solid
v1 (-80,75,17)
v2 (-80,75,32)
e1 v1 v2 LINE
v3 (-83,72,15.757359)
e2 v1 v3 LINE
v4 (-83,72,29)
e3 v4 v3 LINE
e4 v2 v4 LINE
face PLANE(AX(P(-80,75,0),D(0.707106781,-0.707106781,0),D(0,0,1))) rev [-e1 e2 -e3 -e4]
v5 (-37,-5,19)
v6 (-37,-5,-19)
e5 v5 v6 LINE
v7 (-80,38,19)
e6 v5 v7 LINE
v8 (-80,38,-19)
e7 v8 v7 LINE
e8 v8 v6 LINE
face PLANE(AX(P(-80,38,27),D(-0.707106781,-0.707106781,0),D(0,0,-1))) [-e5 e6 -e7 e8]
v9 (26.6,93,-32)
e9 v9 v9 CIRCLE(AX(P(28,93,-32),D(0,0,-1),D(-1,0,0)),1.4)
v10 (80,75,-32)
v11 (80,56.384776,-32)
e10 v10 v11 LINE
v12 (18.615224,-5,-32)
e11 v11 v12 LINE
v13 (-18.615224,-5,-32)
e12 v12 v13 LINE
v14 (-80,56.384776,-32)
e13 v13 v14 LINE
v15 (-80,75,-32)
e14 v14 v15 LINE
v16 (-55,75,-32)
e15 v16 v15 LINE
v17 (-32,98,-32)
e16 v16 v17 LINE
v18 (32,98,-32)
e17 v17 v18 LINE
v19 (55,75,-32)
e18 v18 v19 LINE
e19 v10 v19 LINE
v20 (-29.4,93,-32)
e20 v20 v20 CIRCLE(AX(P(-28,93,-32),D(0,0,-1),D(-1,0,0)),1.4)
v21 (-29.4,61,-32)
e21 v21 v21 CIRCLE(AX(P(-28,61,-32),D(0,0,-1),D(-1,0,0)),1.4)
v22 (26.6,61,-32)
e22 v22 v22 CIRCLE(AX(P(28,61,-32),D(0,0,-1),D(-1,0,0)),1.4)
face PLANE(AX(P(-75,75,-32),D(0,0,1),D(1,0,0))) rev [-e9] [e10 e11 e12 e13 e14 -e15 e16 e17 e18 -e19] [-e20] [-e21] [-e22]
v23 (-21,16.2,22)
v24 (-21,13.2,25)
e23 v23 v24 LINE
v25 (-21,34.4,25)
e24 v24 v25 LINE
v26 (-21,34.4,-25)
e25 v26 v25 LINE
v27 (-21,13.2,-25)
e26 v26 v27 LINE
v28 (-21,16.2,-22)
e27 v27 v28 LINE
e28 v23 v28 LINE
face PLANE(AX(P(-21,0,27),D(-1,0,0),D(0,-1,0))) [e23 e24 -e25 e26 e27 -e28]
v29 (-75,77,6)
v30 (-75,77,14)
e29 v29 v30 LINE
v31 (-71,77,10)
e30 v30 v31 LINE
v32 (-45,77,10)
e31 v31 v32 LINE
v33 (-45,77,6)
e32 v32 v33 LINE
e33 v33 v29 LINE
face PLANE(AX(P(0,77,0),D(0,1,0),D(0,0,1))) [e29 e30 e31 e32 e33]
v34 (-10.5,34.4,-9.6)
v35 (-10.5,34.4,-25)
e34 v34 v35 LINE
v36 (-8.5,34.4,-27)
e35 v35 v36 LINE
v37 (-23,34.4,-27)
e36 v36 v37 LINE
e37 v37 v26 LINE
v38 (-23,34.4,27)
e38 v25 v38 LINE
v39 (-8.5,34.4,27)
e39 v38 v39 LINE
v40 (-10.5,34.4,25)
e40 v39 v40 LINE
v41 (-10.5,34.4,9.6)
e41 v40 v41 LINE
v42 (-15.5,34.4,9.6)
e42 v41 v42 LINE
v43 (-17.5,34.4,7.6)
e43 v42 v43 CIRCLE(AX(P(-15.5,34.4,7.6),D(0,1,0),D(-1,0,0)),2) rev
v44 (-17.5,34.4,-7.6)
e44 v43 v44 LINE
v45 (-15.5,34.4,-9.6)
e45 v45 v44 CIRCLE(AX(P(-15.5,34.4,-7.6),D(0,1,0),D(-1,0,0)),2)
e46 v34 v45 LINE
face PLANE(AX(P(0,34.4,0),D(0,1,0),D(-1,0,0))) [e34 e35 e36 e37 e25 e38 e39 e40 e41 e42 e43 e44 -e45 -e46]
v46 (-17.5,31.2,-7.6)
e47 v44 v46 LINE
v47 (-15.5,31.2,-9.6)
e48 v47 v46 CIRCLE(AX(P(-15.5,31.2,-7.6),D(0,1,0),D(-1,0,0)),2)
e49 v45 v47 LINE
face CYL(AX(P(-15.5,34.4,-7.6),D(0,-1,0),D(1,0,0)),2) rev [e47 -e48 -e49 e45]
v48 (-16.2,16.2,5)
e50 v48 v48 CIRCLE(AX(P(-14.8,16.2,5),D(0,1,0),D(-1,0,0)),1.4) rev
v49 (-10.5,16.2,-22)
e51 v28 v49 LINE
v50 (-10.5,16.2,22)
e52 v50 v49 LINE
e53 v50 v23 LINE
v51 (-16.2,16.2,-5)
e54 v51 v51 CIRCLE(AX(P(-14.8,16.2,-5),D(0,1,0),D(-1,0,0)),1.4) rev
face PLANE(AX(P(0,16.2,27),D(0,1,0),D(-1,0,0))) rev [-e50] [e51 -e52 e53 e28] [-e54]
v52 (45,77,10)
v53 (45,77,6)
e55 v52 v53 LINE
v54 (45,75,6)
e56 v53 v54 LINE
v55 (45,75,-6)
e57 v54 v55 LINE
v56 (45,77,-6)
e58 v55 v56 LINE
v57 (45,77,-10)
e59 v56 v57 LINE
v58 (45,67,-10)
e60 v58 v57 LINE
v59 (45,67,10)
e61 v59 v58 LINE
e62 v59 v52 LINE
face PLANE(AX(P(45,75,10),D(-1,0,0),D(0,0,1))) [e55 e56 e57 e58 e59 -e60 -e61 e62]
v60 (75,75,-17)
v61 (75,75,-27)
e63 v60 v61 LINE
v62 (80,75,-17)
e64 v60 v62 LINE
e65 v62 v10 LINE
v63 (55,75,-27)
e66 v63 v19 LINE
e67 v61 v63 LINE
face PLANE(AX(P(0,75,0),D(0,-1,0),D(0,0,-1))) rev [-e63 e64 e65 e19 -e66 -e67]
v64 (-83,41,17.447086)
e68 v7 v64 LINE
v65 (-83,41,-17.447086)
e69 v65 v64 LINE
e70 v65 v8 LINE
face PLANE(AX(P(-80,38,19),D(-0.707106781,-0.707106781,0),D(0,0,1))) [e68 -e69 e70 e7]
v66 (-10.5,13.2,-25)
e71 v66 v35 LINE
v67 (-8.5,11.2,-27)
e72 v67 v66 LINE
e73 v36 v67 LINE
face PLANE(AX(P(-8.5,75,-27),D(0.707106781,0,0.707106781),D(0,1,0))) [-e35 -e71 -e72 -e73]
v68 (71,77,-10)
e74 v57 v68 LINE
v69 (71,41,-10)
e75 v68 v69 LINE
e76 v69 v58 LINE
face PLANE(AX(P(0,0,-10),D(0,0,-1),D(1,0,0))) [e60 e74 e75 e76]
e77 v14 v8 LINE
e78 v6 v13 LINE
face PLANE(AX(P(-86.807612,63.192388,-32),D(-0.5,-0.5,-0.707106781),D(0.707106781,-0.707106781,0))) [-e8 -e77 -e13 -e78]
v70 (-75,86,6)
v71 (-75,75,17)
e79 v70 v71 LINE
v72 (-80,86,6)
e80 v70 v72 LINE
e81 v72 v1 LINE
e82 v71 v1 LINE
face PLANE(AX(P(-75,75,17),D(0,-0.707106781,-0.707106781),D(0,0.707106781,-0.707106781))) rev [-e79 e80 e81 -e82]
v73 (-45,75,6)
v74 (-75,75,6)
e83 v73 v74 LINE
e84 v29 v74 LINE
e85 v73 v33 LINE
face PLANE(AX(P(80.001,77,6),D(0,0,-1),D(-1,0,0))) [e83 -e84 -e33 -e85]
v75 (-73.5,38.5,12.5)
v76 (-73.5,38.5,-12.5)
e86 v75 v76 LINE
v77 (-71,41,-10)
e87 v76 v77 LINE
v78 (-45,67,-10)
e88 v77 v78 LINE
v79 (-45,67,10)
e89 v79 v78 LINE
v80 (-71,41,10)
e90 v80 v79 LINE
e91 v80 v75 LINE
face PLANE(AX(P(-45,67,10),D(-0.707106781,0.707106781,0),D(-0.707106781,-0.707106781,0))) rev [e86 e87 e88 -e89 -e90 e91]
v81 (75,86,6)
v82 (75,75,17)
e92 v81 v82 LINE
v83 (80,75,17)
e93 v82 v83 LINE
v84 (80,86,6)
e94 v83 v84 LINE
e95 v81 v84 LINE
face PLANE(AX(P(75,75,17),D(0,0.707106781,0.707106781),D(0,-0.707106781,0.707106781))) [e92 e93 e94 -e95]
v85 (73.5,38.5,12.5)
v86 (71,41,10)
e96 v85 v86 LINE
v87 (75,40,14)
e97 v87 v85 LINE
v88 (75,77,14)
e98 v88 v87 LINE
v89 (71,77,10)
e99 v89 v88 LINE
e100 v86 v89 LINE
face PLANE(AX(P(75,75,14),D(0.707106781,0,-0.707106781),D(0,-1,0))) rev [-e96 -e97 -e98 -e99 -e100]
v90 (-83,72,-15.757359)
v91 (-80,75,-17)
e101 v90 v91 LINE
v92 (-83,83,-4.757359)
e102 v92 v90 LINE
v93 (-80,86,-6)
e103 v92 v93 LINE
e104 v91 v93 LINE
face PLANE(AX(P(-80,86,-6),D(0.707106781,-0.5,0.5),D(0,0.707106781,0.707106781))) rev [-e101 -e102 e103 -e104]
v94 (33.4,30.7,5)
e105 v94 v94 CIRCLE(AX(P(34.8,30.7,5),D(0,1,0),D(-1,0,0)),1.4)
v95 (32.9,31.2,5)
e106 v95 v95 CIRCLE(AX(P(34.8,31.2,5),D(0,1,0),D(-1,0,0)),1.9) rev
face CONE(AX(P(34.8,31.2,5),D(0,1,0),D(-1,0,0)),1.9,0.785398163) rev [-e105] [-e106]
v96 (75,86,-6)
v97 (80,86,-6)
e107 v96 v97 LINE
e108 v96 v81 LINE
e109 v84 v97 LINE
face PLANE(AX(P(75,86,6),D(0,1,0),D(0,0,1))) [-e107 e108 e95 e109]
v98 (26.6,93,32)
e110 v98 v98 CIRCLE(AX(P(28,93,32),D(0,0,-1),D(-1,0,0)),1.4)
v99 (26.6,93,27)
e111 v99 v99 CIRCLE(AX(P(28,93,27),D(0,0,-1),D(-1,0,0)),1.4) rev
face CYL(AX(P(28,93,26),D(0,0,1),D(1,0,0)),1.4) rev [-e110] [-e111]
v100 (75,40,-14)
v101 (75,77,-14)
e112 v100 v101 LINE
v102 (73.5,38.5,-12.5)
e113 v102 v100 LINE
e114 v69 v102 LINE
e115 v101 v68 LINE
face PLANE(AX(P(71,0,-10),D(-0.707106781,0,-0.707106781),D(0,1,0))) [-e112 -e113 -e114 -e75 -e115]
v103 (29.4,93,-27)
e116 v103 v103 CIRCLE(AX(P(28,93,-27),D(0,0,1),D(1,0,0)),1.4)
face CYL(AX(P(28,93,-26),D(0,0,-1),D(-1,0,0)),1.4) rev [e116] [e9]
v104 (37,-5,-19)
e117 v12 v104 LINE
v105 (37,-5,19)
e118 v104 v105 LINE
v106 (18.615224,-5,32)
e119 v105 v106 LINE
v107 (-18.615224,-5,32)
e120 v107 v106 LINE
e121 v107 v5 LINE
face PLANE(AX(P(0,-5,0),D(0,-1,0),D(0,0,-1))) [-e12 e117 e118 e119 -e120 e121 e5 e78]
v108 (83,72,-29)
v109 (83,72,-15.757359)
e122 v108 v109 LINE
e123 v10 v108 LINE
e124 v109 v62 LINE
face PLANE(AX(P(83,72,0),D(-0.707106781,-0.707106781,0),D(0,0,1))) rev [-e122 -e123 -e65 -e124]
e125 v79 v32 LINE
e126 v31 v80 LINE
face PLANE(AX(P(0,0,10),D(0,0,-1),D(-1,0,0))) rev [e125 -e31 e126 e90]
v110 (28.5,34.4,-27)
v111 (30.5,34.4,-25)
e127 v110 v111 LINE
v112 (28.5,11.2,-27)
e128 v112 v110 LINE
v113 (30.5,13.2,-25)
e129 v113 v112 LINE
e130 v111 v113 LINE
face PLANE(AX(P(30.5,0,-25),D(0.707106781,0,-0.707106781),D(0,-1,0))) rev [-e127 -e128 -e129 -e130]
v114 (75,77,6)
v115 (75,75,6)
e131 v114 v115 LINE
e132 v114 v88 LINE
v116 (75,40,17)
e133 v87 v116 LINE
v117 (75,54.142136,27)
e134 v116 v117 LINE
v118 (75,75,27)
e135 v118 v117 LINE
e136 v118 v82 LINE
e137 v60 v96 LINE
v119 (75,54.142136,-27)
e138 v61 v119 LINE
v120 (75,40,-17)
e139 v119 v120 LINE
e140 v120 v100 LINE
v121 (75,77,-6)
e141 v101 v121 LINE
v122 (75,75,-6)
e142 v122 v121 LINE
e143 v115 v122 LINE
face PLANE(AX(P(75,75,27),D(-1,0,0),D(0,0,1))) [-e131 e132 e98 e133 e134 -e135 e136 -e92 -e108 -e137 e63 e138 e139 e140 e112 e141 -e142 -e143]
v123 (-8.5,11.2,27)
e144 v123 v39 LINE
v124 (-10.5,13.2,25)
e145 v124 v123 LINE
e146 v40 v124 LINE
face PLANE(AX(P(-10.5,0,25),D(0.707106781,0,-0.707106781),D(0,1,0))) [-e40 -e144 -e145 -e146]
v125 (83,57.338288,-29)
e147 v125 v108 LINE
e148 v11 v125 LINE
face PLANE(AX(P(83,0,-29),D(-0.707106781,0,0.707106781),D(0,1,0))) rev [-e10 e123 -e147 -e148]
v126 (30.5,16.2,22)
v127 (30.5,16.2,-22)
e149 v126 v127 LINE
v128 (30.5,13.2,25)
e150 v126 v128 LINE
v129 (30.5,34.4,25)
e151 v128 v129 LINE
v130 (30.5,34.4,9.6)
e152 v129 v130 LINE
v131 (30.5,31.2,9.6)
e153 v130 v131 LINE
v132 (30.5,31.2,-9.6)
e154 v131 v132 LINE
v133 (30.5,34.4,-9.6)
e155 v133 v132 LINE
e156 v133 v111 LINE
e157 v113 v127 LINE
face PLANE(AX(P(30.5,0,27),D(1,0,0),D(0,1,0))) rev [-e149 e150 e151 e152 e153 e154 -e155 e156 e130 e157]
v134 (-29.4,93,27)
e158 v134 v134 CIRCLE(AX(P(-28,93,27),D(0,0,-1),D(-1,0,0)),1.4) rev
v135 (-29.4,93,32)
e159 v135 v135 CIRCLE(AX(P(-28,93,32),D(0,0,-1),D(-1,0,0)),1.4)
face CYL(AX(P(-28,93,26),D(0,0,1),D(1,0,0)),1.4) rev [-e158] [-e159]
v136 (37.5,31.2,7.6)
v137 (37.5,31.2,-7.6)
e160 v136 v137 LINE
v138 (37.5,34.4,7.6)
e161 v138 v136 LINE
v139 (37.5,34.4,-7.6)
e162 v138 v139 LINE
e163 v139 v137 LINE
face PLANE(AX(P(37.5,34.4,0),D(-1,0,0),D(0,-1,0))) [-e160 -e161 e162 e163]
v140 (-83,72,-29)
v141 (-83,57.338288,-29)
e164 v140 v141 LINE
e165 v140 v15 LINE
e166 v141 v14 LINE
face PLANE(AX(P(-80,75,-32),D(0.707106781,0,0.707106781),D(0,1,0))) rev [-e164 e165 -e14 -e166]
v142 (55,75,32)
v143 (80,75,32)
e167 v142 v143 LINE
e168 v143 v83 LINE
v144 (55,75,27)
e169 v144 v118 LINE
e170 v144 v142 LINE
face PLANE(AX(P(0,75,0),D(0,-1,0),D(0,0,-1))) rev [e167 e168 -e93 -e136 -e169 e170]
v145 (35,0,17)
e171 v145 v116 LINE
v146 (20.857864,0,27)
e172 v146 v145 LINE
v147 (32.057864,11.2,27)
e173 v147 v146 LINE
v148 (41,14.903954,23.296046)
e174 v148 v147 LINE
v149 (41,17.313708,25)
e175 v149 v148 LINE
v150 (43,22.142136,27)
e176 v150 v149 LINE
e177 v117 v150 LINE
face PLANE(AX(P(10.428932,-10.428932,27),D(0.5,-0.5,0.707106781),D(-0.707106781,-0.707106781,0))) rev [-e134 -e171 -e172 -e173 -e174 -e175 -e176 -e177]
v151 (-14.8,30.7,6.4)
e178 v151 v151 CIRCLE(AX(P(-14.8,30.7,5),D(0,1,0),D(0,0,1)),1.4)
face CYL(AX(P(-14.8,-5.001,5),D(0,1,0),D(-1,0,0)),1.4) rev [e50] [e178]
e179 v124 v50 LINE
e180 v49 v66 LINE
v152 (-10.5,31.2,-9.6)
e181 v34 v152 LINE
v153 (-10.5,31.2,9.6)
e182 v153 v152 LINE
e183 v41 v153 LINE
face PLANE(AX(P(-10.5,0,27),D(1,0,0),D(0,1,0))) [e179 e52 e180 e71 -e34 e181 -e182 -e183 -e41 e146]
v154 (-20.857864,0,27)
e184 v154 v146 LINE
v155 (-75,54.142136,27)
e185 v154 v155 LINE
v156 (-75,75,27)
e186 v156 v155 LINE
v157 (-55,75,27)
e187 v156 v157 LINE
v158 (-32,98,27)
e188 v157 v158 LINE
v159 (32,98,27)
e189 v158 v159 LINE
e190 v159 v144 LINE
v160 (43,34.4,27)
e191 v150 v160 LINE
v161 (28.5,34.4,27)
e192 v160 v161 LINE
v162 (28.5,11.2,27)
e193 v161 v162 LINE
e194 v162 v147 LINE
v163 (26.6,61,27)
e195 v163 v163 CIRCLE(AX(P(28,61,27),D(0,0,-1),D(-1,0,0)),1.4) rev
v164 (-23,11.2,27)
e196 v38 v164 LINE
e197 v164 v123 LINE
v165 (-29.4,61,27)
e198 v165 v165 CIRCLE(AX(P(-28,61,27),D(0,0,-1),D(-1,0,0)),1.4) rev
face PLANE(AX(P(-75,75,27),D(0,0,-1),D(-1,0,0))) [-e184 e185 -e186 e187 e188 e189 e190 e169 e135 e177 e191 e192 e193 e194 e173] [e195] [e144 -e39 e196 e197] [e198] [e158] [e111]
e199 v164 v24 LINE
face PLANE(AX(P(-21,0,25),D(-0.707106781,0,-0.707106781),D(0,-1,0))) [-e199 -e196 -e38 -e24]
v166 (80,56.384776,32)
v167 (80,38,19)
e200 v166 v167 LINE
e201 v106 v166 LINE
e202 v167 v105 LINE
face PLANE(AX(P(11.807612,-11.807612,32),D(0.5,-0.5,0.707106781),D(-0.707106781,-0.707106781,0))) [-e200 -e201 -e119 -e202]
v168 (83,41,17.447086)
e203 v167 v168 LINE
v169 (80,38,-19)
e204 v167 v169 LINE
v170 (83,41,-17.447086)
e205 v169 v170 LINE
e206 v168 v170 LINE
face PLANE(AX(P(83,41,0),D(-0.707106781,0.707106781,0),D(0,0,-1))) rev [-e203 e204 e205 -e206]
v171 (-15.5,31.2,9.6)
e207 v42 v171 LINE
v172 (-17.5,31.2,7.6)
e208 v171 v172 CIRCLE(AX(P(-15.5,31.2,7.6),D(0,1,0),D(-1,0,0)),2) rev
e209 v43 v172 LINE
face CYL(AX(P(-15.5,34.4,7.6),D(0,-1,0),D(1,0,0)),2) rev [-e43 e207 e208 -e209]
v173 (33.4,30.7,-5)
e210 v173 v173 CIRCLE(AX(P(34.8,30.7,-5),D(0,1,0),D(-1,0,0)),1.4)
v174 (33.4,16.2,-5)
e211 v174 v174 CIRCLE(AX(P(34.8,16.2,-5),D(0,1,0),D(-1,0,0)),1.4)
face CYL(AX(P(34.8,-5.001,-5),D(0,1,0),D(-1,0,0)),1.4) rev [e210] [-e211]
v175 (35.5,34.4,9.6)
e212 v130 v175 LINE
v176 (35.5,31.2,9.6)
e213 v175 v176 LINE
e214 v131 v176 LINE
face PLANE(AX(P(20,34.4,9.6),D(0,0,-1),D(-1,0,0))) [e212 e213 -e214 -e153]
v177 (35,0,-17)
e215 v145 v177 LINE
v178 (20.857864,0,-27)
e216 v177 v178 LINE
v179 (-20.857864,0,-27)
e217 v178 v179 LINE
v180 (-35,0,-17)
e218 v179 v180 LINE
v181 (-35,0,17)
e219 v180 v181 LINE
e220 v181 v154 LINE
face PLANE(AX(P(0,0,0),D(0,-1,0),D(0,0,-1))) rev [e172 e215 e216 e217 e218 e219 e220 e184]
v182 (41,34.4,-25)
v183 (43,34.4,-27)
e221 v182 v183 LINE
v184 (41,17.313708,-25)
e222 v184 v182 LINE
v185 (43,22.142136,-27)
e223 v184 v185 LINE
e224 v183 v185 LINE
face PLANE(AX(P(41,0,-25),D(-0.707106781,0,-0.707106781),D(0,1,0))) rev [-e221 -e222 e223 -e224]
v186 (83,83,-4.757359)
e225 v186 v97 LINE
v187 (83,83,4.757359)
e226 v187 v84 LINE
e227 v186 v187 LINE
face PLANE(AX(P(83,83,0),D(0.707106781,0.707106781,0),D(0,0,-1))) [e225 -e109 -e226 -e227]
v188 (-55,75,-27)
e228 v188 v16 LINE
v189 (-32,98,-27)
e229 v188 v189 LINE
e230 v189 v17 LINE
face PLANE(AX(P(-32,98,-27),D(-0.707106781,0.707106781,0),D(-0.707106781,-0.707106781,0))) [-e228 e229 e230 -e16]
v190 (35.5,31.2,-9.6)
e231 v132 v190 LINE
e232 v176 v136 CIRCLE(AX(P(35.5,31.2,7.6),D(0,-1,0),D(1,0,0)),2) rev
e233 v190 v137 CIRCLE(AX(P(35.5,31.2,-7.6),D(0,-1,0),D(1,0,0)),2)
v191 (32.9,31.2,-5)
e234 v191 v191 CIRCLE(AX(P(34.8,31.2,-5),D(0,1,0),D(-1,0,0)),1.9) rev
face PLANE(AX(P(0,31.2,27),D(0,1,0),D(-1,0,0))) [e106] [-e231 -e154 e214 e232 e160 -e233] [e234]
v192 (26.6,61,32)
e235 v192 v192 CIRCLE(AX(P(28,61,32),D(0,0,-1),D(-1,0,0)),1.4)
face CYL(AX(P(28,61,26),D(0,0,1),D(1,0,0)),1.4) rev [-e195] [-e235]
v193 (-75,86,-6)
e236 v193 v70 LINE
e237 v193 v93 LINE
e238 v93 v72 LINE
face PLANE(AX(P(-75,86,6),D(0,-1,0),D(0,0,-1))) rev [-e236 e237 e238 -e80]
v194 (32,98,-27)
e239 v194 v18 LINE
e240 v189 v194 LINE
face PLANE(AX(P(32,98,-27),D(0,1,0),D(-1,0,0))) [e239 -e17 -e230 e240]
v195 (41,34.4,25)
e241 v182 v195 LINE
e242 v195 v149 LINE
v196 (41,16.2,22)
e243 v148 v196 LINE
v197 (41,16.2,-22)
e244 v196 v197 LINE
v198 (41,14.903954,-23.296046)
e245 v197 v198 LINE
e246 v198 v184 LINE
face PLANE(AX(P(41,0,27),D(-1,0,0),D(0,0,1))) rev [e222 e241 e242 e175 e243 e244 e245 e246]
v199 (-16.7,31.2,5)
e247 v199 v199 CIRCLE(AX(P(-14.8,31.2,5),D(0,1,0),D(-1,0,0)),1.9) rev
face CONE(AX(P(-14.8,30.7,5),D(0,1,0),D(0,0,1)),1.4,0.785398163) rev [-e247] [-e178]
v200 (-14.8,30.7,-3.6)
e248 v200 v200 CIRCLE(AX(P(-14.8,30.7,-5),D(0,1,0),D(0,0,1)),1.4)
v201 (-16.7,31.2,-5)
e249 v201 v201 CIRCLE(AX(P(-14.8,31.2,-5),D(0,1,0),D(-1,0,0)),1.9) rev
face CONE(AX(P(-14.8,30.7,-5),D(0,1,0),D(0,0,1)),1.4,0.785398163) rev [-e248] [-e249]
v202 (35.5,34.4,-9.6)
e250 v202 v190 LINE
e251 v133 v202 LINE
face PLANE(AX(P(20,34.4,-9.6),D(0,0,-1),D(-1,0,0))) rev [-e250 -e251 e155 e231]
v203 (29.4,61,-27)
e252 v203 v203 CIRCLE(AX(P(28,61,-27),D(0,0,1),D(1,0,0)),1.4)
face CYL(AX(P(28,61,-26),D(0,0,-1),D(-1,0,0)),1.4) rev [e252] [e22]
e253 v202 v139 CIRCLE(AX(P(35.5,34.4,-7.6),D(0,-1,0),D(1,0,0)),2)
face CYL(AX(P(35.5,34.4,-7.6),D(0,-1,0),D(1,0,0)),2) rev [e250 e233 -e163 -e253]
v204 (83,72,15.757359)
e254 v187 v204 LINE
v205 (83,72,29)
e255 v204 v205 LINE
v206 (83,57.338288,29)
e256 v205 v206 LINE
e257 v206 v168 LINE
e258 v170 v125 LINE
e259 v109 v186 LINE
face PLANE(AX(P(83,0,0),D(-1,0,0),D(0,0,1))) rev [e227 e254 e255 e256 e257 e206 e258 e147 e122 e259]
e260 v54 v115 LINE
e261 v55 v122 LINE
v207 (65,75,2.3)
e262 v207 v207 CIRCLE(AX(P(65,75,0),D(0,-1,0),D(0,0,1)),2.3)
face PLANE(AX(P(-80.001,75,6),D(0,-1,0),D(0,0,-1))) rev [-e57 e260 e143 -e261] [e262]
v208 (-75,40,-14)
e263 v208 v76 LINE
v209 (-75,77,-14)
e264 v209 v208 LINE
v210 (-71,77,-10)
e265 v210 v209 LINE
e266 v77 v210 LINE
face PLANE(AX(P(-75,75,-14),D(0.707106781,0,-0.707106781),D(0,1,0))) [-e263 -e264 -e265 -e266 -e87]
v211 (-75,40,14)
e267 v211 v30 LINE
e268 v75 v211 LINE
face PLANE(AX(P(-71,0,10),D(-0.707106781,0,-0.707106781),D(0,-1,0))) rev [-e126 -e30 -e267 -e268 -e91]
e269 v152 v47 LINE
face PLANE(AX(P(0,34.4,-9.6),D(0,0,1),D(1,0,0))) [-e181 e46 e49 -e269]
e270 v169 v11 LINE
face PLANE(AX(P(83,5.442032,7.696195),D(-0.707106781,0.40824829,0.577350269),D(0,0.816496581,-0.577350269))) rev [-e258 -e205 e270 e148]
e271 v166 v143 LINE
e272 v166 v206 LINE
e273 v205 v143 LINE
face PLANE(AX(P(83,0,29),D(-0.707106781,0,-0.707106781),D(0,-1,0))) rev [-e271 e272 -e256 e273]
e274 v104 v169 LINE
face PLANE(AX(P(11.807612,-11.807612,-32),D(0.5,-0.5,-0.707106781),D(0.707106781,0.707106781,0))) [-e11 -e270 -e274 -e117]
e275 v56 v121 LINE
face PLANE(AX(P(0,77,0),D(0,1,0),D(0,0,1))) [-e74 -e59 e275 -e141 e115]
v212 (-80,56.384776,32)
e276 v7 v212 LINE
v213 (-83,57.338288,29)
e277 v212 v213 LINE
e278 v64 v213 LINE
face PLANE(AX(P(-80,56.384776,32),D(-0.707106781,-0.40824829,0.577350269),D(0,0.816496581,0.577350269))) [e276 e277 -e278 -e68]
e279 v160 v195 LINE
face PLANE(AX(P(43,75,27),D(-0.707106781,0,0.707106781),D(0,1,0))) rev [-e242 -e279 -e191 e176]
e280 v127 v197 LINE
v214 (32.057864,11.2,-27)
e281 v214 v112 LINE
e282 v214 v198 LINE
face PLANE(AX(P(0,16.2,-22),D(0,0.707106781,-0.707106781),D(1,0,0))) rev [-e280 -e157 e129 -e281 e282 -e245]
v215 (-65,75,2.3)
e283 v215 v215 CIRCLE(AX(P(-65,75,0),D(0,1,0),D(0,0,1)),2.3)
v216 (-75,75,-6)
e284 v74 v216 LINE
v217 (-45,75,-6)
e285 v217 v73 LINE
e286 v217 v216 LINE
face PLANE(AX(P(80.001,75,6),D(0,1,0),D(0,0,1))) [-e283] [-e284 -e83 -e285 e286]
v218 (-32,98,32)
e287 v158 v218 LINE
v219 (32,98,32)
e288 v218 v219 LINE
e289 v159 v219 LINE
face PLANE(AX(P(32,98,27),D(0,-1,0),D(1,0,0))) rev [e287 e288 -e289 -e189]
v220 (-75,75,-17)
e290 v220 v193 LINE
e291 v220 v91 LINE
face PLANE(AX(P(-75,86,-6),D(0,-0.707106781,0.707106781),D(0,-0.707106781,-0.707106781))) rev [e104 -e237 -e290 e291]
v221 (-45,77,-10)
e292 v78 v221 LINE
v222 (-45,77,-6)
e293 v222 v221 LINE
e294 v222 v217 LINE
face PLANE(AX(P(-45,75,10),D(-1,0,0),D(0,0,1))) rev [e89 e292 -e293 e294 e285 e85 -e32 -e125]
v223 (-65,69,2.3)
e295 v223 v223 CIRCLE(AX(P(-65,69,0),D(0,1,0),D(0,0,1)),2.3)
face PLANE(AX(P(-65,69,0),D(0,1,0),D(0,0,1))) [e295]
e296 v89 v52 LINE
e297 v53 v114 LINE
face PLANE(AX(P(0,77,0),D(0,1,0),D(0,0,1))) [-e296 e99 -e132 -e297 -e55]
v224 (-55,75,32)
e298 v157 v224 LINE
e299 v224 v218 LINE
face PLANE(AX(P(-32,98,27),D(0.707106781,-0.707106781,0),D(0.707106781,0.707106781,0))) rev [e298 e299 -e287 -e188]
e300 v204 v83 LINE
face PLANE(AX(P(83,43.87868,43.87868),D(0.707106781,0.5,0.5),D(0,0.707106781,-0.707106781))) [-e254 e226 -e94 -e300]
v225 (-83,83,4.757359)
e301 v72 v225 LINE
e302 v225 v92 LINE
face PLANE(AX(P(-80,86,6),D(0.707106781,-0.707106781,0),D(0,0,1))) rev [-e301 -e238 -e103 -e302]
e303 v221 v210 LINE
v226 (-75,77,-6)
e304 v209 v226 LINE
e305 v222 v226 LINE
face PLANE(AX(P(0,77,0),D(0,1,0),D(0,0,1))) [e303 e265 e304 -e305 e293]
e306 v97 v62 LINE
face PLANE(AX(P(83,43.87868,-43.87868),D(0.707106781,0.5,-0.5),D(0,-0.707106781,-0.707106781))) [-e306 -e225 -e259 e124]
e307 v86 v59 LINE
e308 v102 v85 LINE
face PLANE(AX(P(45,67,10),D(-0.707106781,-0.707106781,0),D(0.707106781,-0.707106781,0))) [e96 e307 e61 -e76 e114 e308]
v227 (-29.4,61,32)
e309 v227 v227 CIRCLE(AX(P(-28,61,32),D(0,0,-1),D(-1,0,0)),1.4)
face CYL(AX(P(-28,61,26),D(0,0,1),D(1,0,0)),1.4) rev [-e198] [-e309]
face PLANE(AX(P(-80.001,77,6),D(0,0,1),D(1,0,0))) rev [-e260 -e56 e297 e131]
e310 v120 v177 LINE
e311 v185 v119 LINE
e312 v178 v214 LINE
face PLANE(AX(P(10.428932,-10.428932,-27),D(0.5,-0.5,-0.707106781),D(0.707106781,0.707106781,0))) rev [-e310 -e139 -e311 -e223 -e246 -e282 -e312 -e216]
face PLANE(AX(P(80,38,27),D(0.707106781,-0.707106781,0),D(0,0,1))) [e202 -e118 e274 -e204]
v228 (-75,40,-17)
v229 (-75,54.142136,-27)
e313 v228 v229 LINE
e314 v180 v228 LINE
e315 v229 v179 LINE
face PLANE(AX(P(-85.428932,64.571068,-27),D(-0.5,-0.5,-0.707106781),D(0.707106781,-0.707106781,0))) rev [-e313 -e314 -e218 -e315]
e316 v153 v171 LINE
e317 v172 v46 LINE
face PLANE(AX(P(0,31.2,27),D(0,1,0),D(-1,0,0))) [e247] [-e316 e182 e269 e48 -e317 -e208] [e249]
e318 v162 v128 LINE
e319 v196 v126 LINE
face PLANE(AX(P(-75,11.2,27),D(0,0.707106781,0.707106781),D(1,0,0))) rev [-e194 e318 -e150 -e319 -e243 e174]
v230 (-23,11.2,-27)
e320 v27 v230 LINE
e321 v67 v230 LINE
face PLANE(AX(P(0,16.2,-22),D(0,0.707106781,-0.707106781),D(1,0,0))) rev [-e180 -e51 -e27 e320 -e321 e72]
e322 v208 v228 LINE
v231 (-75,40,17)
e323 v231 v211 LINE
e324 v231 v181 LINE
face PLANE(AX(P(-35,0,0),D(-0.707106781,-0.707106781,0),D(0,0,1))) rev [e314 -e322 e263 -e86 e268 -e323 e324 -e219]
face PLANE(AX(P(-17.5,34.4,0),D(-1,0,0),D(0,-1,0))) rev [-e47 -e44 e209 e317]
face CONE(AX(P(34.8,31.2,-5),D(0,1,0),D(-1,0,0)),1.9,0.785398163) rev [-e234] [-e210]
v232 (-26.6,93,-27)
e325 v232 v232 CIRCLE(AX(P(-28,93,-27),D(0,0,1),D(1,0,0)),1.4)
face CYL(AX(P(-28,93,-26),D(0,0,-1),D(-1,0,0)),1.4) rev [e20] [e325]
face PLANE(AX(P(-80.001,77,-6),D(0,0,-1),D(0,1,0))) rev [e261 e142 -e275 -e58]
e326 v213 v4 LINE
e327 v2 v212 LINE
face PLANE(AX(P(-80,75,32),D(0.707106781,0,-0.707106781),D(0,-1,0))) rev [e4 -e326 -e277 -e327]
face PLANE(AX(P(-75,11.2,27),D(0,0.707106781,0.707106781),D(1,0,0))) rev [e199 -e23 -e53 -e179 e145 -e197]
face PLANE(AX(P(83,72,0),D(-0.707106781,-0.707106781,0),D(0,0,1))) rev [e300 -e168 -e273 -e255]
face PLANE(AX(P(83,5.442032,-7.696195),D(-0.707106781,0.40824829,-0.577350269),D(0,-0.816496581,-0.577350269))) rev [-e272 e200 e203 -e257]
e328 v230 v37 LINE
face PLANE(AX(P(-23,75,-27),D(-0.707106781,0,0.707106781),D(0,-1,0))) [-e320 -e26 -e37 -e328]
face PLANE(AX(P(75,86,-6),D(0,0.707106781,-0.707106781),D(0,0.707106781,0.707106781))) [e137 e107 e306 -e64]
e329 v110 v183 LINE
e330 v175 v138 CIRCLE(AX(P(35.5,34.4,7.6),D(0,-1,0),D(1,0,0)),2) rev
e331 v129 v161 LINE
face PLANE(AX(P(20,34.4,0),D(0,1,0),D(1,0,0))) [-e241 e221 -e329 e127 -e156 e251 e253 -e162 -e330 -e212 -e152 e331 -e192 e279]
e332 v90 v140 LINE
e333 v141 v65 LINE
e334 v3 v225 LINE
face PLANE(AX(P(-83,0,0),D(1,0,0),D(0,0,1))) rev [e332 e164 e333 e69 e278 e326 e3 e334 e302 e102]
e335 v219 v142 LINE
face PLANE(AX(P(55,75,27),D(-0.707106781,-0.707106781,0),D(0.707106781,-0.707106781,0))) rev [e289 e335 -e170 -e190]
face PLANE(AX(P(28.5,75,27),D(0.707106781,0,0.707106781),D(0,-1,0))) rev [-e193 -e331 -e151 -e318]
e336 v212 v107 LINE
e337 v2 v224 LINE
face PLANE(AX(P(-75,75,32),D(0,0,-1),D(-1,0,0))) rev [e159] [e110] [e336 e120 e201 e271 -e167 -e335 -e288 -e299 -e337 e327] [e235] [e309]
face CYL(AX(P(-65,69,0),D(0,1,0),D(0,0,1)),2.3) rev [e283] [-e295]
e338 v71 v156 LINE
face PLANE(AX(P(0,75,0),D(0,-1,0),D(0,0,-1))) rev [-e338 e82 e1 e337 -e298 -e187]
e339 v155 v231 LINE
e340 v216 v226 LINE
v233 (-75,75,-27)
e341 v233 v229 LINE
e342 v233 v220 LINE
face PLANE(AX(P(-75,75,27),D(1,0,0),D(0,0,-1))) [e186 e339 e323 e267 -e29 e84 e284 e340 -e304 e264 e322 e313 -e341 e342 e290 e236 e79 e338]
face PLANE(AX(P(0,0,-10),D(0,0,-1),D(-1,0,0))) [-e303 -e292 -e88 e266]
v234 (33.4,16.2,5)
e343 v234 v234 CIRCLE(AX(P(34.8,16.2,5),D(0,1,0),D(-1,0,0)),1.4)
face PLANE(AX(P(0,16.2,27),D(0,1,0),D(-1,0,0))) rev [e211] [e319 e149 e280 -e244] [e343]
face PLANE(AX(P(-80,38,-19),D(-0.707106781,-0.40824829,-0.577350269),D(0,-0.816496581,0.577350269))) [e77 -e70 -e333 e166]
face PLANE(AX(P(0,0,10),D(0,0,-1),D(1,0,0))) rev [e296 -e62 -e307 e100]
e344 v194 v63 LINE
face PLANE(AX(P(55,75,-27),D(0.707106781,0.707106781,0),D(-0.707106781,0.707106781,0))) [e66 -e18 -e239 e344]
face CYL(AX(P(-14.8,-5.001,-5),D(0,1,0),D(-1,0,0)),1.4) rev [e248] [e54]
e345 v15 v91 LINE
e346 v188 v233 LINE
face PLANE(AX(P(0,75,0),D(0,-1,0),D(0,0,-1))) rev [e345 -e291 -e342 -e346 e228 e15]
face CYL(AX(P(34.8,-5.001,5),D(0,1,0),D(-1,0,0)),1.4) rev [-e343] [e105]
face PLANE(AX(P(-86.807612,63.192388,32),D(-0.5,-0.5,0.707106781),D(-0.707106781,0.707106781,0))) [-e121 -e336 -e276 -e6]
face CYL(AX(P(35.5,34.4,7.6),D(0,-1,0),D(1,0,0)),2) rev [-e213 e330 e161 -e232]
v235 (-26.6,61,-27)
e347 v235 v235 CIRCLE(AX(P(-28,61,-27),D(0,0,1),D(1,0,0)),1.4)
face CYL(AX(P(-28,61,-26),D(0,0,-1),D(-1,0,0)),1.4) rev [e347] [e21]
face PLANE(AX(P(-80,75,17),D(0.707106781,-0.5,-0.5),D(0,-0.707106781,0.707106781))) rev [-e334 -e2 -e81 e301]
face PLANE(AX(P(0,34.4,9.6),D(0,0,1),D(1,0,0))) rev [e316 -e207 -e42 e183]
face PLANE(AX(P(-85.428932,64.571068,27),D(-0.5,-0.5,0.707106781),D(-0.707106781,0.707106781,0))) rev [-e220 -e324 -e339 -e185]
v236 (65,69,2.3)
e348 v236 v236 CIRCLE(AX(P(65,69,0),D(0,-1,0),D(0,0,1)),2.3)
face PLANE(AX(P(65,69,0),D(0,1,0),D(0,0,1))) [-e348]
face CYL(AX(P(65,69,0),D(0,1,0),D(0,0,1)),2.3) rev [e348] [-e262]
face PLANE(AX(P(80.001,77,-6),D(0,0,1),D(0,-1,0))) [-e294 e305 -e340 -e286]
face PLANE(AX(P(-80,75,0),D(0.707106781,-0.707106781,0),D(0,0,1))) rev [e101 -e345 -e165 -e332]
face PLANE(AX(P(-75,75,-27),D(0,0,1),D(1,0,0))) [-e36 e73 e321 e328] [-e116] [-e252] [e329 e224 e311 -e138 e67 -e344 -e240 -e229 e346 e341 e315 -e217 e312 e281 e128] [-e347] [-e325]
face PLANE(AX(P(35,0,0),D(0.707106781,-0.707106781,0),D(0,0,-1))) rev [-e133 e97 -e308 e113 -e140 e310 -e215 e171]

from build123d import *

# Parameters (mm, degrees)
SKETCH1_W                  = 150
SKETCH1_H                  = 54
BOSS_EXTRUDE1_DEPTH        = 75
SHELL1_T                   = 5
BOSS_EXTRUDE2_DEPTH        = 5
BOSS_EXTRUDE3_DEPTH        = 5
SKETCH3_R                  = 1.4
CUT_EXTRUDE1_DEPTH         = 6
BOSS_EXTRUDE4_DEPTH        = 10
SKETCH9_W                  = 30
SKETCH9_H                  = 20
BOSS_EXTRUDE6_DEPTH        = 2
CUT_EXTRUDE2_REACH         = 188.153
SKETCH10_W                 = 12
SKETCH10_H                 = 2
SKETCH11_R                 = 2.3
CUT_EXTRUDE3_DEPTH         = 6
SKETCH13_W                 = 10.5
SKETCH13_H                 = 15
BOSS_EXTRUDE8_DEPTH        = 27
BOSS_EXTRUDE9_DEPTH        = 3.2
CUT_EXTRUDE4_REACH         = 111.024
SKETCH15_R                 = 1.4
CHAMFER8_SIZE              = 0.5
CHAMFER8_OF_MIRROR6_SIZE   = 0.5
CHAMFER3_SIZE              = 40
CHAMFER5_SIZE              = 43
CHAMFER9_SIZE              = 5
CHAMFER10_SIZE             = 2
CHAMFER11_SIZE             = 10
CHAMFER12_SIZE             = 13
CHAMFER13_SIZE             = 4
BOSS_EXTRUDE10_DEPTH       = 3
CHAMFER14_SIZE             = 3
CHAMFER14_OF_MIRROR28_SIZE = 3


# Some blends are built 0.0001 mm under size
with BuildPart() as part:
    # Sketch1 → Boss-Extrude1 (new body)
    with BuildSketch(Plane(origin=(0, 0, 0), x_dir=(1, 0, 0), z_dir=(0, 1, 0))):
        Rectangle(SKETCH1_W, SKETCH1_H)
    extrude(amount=BOSS_EXTRUDE1_DEPTH)

    # Shell1
    shell1_openings = [part.faces().sort_by_distance(p)[0] for p in [
        (0, 75, 0),
    ]]
    offset(amount=SHELL1_T, openings=shell1_openings, kind=Kind.INTERSECTION)

    # Sketch2 → Boss-Extrude2 (add)
    with BuildSketch(Plane(origin=(80, 0, 0), x_dir=(0, 0, -1), z_dir=(1, 0, 0))):
        Polygon((-17, 75), (-6, 86), (6, 86), (17, 75), align=None)
    boss_extrude2 = extrude(amount=-BOSS_EXTRUDE2_DEPTH)

    # Sketch4 → Boss-Extrude3 (add)
    with BuildSketch(Plane(origin=(0, 0, -32), x_dir=(-1, 0, 0), z_dir=(0, 0, -1))):
        Polygon((-55, 75), (-32, 98), (32, 98), (55, 75), align=None)
    boss_extrude3 = extrude(amount=-BOSS_EXTRUDE3_DEPTH)

    # Sketch3 → Cut-Extrude1 (cut)
    with BuildSketch(Plane(origin=(0, 0, -32), x_dir=(-1, 0, 0), z_dir=(0, 0, -1))):
        with Locations((-28, 93)):
            Circle(SKETCH3_R)
        with Locations((-28, 61)):
            Circle(SKETCH3_R)
        with Locations((28, 93)):
            Circle(SKETCH3_R)
        with Locations((28, 61)):
            Circle(SKETCH3_R)
    cut_extrude1 = extrude(amount=-CUT_EXTRUDE1_DEPTH, mode=Mode.SUBTRACT)

    # Mirror4: Boss-Extrude3, Cut-Extrude1 across plane
    add(boss_extrude3.mirror(Plane.XY))
    add(cut_extrude1.mirror(Plane.XY), mode=Mode.SUBTRACT)

    # Mirror5: Boss-Extrude2 across plane
    add(boss_extrude2.mirror(Plane(origin=(0, 0, 0), x_dir=(0, 0, 1), z_dir=(1, 0, 0))))

    # Sketch5 → Boss-Extrude4 (add, symmetric)
    with BuildSketch(Plane.XY):
        Polygon((-75, 75), (-45, 75), (-45, 67), (-75, 37), align=None)
    boss_extrude4 = extrude(amount=BOSS_EXTRUDE4_DEPTH, both=True)

    # Sketch9 → Boss-Extrude6 (add)
    with BuildSketch(Plane(origin=(0, 75, 0), x_dir=(1, 0, 0), z_dir=(0, 1, 0))):
        with Locations((-60, 0)):
            Rectangle(SKETCH9_W, SKETCH9_H)
    boss_extrude6 = extrude(amount=BOSS_EXTRUDE6_DEPTH)

    # Sketch10 → Cut-Extrude2 (cut, up to next)
    with BuildSketch(Plane(origin=(-75, 0, 0), x_dir=(0, 0, -1), z_dir=(1, 0, 0)), mode=Mode.PRIVATE) as cut_extrude2_sk1:
        with Locations((0, 76)):
            Rectangle(SKETCH10_W, SKETCH10_H)
    cut_extrude2_tool1 = extrude(cut_extrude2_sk1.sketch, amount=CUT_EXTRUDE2_REACH, mode=Mode.PRIVATE) & part.part
    cut_extrude2 = cut_extrude2_tool1.solids().sort_by_distance((-75, 76, 0))[0]
    add(cut_extrude2, mode=Mode.SUBTRACT)

    # Sketch11 → Cut-Extrude3 (cut)
    with BuildSketch(Plane(origin=(0, 75, 0), x_dir=(1, 0, 0), z_dir=(0, 1, 0))):
        with Locations(Location((-65, 0, 0), (0, 0, 270))):
            Circle(SKETCH11_R)
    cut_extrude3 = extrude(amount=-CUT_EXTRUDE3_DEPTH, mode=Mode.SUBTRACT)

    # Mirror24: Boss-Extrude4, Boss-Extrude6, Cut-Extrude2, Cut-Extrude3 across plane
    add(boss_extrude4.mirror(Plane(origin=(0, 0, 0), x_dir=(0, 0, 1), z_dir=(1, 0, 0))))
    add(boss_extrude6.mirror(Plane(origin=(0, 0, 0), x_dir=(0, 0, 1), z_dir=(1, 0, 0))))
    add(cut_extrude2.mirror(Plane(origin=(0, 0, 0), x_dir=(0, 0, 1), z_dir=(1, 0, 0))), mode=Mode.SUBTRACT)
    add(cut_extrude3.mirror(Plane(origin=(0, 0, 0), x_dir=(0, 0, 1), z_dir=(1, 0, 0))), mode=Mode.SUBTRACT)

    # Sketch13 → Boss-Extrude8 (add, symmetric)
    with BuildSketch(Plane.XY):
        with Locations((35.75, 23.7)):
            Rectangle(SKETCH13_W, SKETCH13_H)
        with Locations((-15.75, 23.7)):
            Rectangle(SKETCH13_W, SKETCH13_H)
    extrude(amount=BOSS_EXTRUDE8_DEPTH, both=True)

    # Sketch14 → Boss-Extrude9 (add)
    with BuildSketch(Plane(origin=(0, 31.2, 0), x_dir=(1, 0, 0), z_dir=(0, 1, 0))):
        with BuildLine():
            Line((-10.5, -27), (-10.5, -9.6))
            Line((-10.5, -9.6), (-15.5, -9.6))
            ThreePointArc((-15.5, -9.6), (-16.914213562, -9.014213562), (-17.5, -7.6))
            Line((-17.5, -7.6), (-17.5, 7.6))
            ThreePointArc((-17.5, 7.6), (-16.914213562, 9.014213562), (-15.5, 9.6))
            Line((-15.5, 9.6), (-10.5, 9.6))
            Line((-10.5, 9.6), (-10.5, 27))
            Line((-10.5, 27), (-21, 27))
            Line((-21, 27), (-21, -27))
            Line((-21, -27), (-10.5, -27))
        make_face()
    boss_extrude9 = extrude(amount=BOSS_EXTRUDE9_DEPTH)

    # Sketch15 → Cut-Extrude4 (cut, up to next)
    with BuildSketch(Plane(origin=(0, 31.2, 0), x_dir=(1, 0, 0), z_dir=(0, 1, 0)), mode=Mode.PRIVATE) as cut_extrude4_sk1:
        with Locations(Location((-14.8, 5, 0), (0, 0, 180))):
            Circle(SKETCH15_R)
    cut_extrude4_tool1 = extrude(cut_extrude4_sk1.sketch, amount=-CUT_EXTRUDE4_REACH, mode=Mode.PRIVATE) & part.part
    # Sketch15 → Cut-Extrude4 (cut, up to next)
    with BuildSketch(Plane(origin=(0, 31.2, 0), x_dir=(1, 0, 0), z_dir=(0, 1, 0)), mode=Mode.PRIVATE) as cut_extrude4_sk2:
        with Locations(Location((-14.8, -5, 0), (0, 0, 180))):
            Circle(SKETCH15_R)
    cut_extrude4_tool2 = extrude(cut_extrude4_sk2.sketch, amount=-CUT_EXTRUDE4_REACH, mode=Mode.PRIVATE) & part.part
    cut_extrude4_1 = cut_extrude4_tool1.solids().sort_by_distance((-14.8, 31.2, -5))[0]
    add(cut_extrude4_1, mode=Mode.SUBTRACT)
    cut_extrude4_2 = cut_extrude4_tool2.solids().sort_by_distance((-14.8, 31.2, 5))[0]
    add(cut_extrude4_2, mode=Mode.SUBTRACT)
    cut_extrude4 = cut_extrude4_1 + cut_extrude4_2  # Cut-Extrude4 as one shape, for the pattern or mirror that repeats it

    # Chamfer8
    chamfer8_edges = [part.edges().sort_by_distance(p)[0] for p in [
        (-13.4, 31.2, -5),
        (-13.4, 31.2, 5),
    ]]
    chamfer(chamfer8_edges, length=CHAMFER8_SIZE)

    # Mirror6: Boss-Extrude9, Cut-Extrude4 across plane
    add(boss_extrude9.mirror(Plane(origin=(10, 0, 0), x_dir=(0, 0, 1), z_dir=(1, 0, 0))))
    add(cut_extrude4.mirror(Plane(origin=(10, 0, 0), x_dir=(0, 0, 1), z_dir=(1, 0, 0))), mode=Mode.SUBTRACT)

    # Chamfer8 of Mirror6
    chamfer8_of_mirror6_edges = [part.edges().sort_by_distance(p)[0] for p in [
        (33.4, 31.2, -5),
        (33.4, 31.2, 5),
    ]]
    chamfer(chamfer8_of_mirror6_edges, length=CHAMFER8_OF_MIRROR6_SIZE)

    # Chamfer3
    # the kernel refuses this chamfer: 40 mm, written as the material it adds along each edge
    with BuildSketch(Plane(origin=(75, 0, 27), x_dir=(0.027495876610586317, 0.9996219169112968, 0), z_dir=(0, 0, -1)), Plane(origin=(-75, 0, -27), x_dir=(-0.027495876610586317, 0.9996219169112968, 0), z_dir=(0, 0, 1))) as chamfer3_piece_1:
        Polygon((CHAMFER3_SIZE * 0.999621916911, -CHAMFER3_SIZE * 0.0274958766106), (-CHAMFER3_SIZE * 0.0274958766106, -CHAMFER3_SIZE * 0.999621916911), (0, 0), align=None)
    extrude(amount=54)

    # Chamfer5
    chamfer5_edges = [part.edges().sort_by_distance(p)[0] for p in [
        (-80, -5, 0),
        (80, -5, 0),
    ]]
    chamfer(chamfer5_edges, length=CHAMFER5_SIZE)

    # Chamfer9
    chamfer9_edges = [part.edges().sort_by_distance(p)[0] for p in [
        (35.75, 16.2, -27),
        (35.75, 16.2, 27),
        (-15.75, 16.2, -27),
        (-15.75, 16.2, 27),
    ]]
    chamfer(chamfer9_edges, length=CHAMFER9_SIZE)

    # Chamfer10
    chamfer10_edges = [part.edges().sort_by_distance(p)[0] for p in [
        (30.5, 22.8, -27),
        (41, 22.8, -27),
        (30.5, 22.8, 27),
        (41, 22.8, 27),
        (-10.5, 22.8, 27),
        (-21, 22.8, 27),
        (-10.5, 22.8, -27),
        (-21, 22.8, -27),
    ]]
    chamfer(chamfer10_edges, length=CHAMFER10_SIZE)

    # Chamfer11
    # the kernel refuses this chamfer: 10 mm, written as the material it adds along each edge
    with BuildSketch(Plane(origin=(93.184544799, 58.184544799, 27), x_dir=(-0.7068394360703909, 0.706839436070956, 0.027495876610586303), z_dir=(-0.7071067811868302, -0.7071067811862648, 0))) as chamfer11_piece_1_section:
        Polygon((CHAMFER11_SIZE * 0.999621916911, CHAMFER11_SIZE * 0.0274958766106), (-CHAMFER11_SIZE * 0.0274958766106, CHAMFER11_SIZE * 0.999621916911), (0, 0), align=None)
    chamfer11_piece_1 = extrude(amount=108.002202254, mode=Mode.PRIVATE)
    chamfer11_piece_1 = split(chamfer11_piece_1, bisect_by=Plane(origin=(75, 22.474171504, 23.809556955), z_dir=(-1, 0, 0)), keep=Keep.TOP, mode=Mode.PRIVATE)
    chamfer11_piece_1 = split(chamfer11_piece_1, bisect_by=Plane(origin=(52.525828496, 0, 23.809556955), z_dir=(0, 1, 0)), keep=Keep.TOP, mode=Mode.PRIVATE)
    add(chamfer11_piece_1)
    with BuildSketch(Plane(origin=(93.184544799, 58.184544799, -27), x_dir=(-0.7068394360703909, 0.7068394360709561, -0.027495876610586348), z_dir=(-0.7071067811868302, -0.7071067811862648, 0))) as chamfer11_piece_2_section:
        Polygon((CHAMFER11_SIZE * 0.999621916911, -CHAMFER11_SIZE * 0.0274958766106), (-CHAMFER11_SIZE * 0.0274958766106, -CHAMFER11_SIZE * 0.999621916911), (0, 0), align=None)
    chamfer11_piece_2 = extrude(amount=108.002202254, mode=Mode.PRIVATE)
    chamfer11_piece_2 = split(chamfer11_piece_2, bisect_by=Plane(origin=(75, 22.474171504, -23.809556955), z_dir=(-1, 0, 0)), keep=Keep.TOP, mode=Mode.PRIVATE)
    chamfer11_piece_2 = split(chamfer11_piece_2, bisect_by=Plane(origin=(52.525828496, 0, -23.809556955), z_dir=(0, 1, 0)), keep=Keep.TOP, mode=Mode.PRIVATE)
    add(chamfer11_piece_2)
    with BuildSketch(Plane(origin=(-93.184544799, 58.184544799, -27), x_dir=(0.7068394360703909, 0.706839436070956, -0.027495876610586303), z_dir=(0.7071067811868302, -0.7071067811862648, 0))) as chamfer11_piece_3_section:
        Polygon((CHAMFER11_SIZE * 0.999621916911, CHAMFER11_SIZE * 0.0274958766106), (-CHAMFER11_SIZE * 0.0274958766106, CHAMFER11_SIZE * 0.999621916911), (0, 0), align=None)
    chamfer11_piece_3 = extrude(amount=108.002202254, mode=Mode.PRIVATE)
    chamfer11_piece_3 = split(chamfer11_piece_3, bisect_by=Plane(origin=(-75, 22.474171504, -23.809556955), z_dir=(1, 0, 0)), keep=Keep.TOP, mode=Mode.PRIVATE)
    chamfer11_piece_3 = split(chamfer11_piece_3, bisect_by=Plane(origin=(-52.525828496, 0, -23.809556955), z_dir=(0, 1, 0)), keep=Keep.TOP, mode=Mode.PRIVATE)
    add(chamfer11_piece_3)
    with BuildSketch(Plane(origin=(-93.184544799, 58.184544799, 27), x_dir=(0.7068394360703909, 0.7068394360709561, 0.027495876610586334), z_dir=(0.7071067811868302, -0.7071067811862648, 0))) as chamfer11_piece_4_section:
        Polygon((CHAMFER11_SIZE * 0.999621916911, -CHAMFER11_SIZE * 0.0274958766106), (-CHAMFER11_SIZE * 0.0274958766106, -CHAMFER11_SIZE * 0.999621916911), (0, 0), align=None)
    chamfer11_piece_4 = extrude(amount=108.002202254, mode=Mode.PRIVATE)
    chamfer11_piece_4 = split(chamfer11_piece_4, bisect_by=Plane(origin=(-75, 22.474171504, 23.809556955), z_dir=(1, 0, 0)), keep=Keep.TOP, mode=Mode.PRIVATE)
    chamfer11_piece_4 = split(chamfer11_piece_4, bisect_by=Plane(origin=(-52.525828496, 0, 23.809556955), z_dir=(0, 1, 0)), keep=Keep.TOP, mode=Mode.PRIVATE)
    add(chamfer11_piece_4)

    # Chamfer12
    chamfer12_edges = [part.edges().sort_by_distance(p)[0] for p in [
        (-58.5, 16.5, -32),
        (58.5, 16.5, -32),
        (-58.5, 16.5, 32),
        (58.5, 16.5, 32),
    ]]
    chamfer(chamfer12_edges, length=CHAMFER12_SIZE)

    # Chamfer13
    # the kernel refuses this chamfer: 4 mm, written as the material it adds along each edge
    with BuildSketch(Plane(origin=(-75, 29.713268048, 10), x_dir=(-0.027495876610585623, 0, 0.9996219169112968), z_dir=(0, 1, 0))) as chamfer13_piece_1_section:
        Polygon((CHAMFER13_SIZE * 0.999621916911, CHAMFER13_SIZE * 0.0274958766106), (-CHAMFER13_SIZE * 0.0274958766106, CHAMFER13_SIZE * 0.999621916911), (0, 0), align=None)
    chamfer13_piece_1 = extrude(amount=47.286731952, mode=Mode.PRIVATE)
    chamfer13_piece_1 = split(chamfer13_piece_1, bisect_by=Plane(origin=(-63.755995162, 48.244004838, 11.33377678), z_dir=(-0.7071067811865515, 0.7071067811865436, 0)), keep=Keep.TOP, mode=Mode.PRIVATE)
    add(chamfer13_piece_1)
    with BuildSketch(Plane(origin=(-75, 77, -10), x_dir=(-0.027495876610737532, 0, -0.9996219169112927), z_dir=(0, -1, 0))) as chamfer13_piece_2_section:
        Polygon((CHAMFER13_SIZE * 0.999621916911, CHAMFER13_SIZE * 0.0274958766106), (-CHAMFER13_SIZE * 0.0274958766107, CHAMFER13_SIZE * 0.999621916911), (0, 0), align=None)
    chamfer13_piece_2 = extrude(amount=47.286731952, mode=Mode.PRIVATE)
    chamfer13_piece_2 = split(chamfer13_piece_2, bisect_by=Plane(origin=(-63.755995162, 48.244004838, -11.33377678), z_dir=(-0.7071067811865515, 0.7071067811865436, 0)), keep=Keep.TOP, mode=Mode.PRIVATE)
    add(chamfer13_piece_2)
    with BuildSketch(Plane(origin=(75, 77, 10), x_dir=(0.02749587661043717, 0, 0.9996219169113009), z_dir=(0, -1, 0))) as chamfer13_piece_3_section:
        Polygon((CHAMFER13_SIZE * 0.999621916911, CHAMFER13_SIZE * 0.0274958766106), (-CHAMFER13_SIZE * 0.0274958766104, CHAMFER13_SIZE * 0.999621916911), (0, 0), align=None)
    chamfer13_piece_3 = extrude(amount=47.286731952, mode=Mode.PRIVATE)
    chamfer13_piece_3 = split(chamfer13_piece_3, bisect_by=Plane(origin=(63.755995162, 48.244004838, 11.33377678), z_dir=(0.7071067811865515, 0.7071067811865436, 0)), keep=Keep.TOP, mode=Mode.PRIVATE)
    add(chamfer13_piece_3)
    with BuildSketch(Plane(origin=(75, 29.713268048, -10), x_dir=(0.027495876610585623, 0, -0.9996219169112968), z_dir=(0, 1, 0))) as chamfer13_piece_4_section:
        Polygon((CHAMFER13_SIZE * 0.999621916911, CHAMFER13_SIZE * 0.0274958766106), (-CHAMFER13_SIZE * 0.0274958766106, CHAMFER13_SIZE * 0.999621916911), (0, 0), align=None)
    chamfer13_piece_4 = extrude(amount=47.286731952, mode=Mode.PRIVATE)
    chamfer13_piece_4 = split(chamfer13_piece_4, bisect_by=Plane(origin=(63.755995162, 48.244004838, -11.33377678), z_dir=(0.7071067811865515, 0.7071067811865436, 0)), keep=Keep.TOP, mode=Mode.PRIVATE)
    add(chamfer13_piece_4)

    # Sketch16 → Boss-Extrude10 (add)
    with BuildSketch(Plane(origin=(80, 0, 0), x_dir=(0, 0, -1), z_dir=(1, 0, 0))):
        Polygon((-19, 38), (19, 38), (32, 56.384776311), (32, 75), (17, 75), (6, 86), (-6, 86), (-17, 75), (-32, 75), (-32, 56.384776311), align=None)
    boss_extrude10 = extrude(amount=BOSS_EXTRUDE10_DEPTH)

    # Chamfer14
    chamfer14_edges = [part.edges().sort_by_distance(p)[0] for p in [
        (83, 65.692388155, 32),
        (83, 75, 24.5),
        (83, 80.5, 11.5),
        (83, 86, 0),
        (83, 80.5, -11.5),
        (83, 75, -24.5),
        (83, 65.692388155, -32),
        (83, 47.192388155, -25.5),
        (83, 38, 0),
        (83, 47.192388155, 25.5),
    ]]
    chamfer(chamfer14_edges, length=CHAMFER14_SIZE - 0.0001)  # a hair under: the kernel refuses the full size

    # Mirror28: Boss-Extrude10 across plane
    add(boss_extrude10.mirror(Plane(origin=(0, 0, 0), x_dir=(0, 0, 1), z_dir=(1, 0, 0))))

    # Chamfer14 of Mirror28
    chamfer14_of_mirror28_edges = [part.edges().sort_by_distance(p)[0] for p in [
        (-83, 65.692388155, 32),
        (-83, 75, 24.5),
        (-83, 80.5, 11.5),
        (-83, 86, 0),
        (-83, 80.5, -11.5),
        (-83, 75, -24.5),
        (-83, 65.692388155, -32),
        (-83, 47.192388155, -25.5),
        (-83, 38, 0),
        (-83, 47.192388155, 25.5),
    ]]
    chamfer(chamfer14_of_mirror28_edges, length=CHAMFER14_OF_MIRROR28_SIZE - 0.0001)  # a hair under: the kernel refuses the full size


solid = part.part
